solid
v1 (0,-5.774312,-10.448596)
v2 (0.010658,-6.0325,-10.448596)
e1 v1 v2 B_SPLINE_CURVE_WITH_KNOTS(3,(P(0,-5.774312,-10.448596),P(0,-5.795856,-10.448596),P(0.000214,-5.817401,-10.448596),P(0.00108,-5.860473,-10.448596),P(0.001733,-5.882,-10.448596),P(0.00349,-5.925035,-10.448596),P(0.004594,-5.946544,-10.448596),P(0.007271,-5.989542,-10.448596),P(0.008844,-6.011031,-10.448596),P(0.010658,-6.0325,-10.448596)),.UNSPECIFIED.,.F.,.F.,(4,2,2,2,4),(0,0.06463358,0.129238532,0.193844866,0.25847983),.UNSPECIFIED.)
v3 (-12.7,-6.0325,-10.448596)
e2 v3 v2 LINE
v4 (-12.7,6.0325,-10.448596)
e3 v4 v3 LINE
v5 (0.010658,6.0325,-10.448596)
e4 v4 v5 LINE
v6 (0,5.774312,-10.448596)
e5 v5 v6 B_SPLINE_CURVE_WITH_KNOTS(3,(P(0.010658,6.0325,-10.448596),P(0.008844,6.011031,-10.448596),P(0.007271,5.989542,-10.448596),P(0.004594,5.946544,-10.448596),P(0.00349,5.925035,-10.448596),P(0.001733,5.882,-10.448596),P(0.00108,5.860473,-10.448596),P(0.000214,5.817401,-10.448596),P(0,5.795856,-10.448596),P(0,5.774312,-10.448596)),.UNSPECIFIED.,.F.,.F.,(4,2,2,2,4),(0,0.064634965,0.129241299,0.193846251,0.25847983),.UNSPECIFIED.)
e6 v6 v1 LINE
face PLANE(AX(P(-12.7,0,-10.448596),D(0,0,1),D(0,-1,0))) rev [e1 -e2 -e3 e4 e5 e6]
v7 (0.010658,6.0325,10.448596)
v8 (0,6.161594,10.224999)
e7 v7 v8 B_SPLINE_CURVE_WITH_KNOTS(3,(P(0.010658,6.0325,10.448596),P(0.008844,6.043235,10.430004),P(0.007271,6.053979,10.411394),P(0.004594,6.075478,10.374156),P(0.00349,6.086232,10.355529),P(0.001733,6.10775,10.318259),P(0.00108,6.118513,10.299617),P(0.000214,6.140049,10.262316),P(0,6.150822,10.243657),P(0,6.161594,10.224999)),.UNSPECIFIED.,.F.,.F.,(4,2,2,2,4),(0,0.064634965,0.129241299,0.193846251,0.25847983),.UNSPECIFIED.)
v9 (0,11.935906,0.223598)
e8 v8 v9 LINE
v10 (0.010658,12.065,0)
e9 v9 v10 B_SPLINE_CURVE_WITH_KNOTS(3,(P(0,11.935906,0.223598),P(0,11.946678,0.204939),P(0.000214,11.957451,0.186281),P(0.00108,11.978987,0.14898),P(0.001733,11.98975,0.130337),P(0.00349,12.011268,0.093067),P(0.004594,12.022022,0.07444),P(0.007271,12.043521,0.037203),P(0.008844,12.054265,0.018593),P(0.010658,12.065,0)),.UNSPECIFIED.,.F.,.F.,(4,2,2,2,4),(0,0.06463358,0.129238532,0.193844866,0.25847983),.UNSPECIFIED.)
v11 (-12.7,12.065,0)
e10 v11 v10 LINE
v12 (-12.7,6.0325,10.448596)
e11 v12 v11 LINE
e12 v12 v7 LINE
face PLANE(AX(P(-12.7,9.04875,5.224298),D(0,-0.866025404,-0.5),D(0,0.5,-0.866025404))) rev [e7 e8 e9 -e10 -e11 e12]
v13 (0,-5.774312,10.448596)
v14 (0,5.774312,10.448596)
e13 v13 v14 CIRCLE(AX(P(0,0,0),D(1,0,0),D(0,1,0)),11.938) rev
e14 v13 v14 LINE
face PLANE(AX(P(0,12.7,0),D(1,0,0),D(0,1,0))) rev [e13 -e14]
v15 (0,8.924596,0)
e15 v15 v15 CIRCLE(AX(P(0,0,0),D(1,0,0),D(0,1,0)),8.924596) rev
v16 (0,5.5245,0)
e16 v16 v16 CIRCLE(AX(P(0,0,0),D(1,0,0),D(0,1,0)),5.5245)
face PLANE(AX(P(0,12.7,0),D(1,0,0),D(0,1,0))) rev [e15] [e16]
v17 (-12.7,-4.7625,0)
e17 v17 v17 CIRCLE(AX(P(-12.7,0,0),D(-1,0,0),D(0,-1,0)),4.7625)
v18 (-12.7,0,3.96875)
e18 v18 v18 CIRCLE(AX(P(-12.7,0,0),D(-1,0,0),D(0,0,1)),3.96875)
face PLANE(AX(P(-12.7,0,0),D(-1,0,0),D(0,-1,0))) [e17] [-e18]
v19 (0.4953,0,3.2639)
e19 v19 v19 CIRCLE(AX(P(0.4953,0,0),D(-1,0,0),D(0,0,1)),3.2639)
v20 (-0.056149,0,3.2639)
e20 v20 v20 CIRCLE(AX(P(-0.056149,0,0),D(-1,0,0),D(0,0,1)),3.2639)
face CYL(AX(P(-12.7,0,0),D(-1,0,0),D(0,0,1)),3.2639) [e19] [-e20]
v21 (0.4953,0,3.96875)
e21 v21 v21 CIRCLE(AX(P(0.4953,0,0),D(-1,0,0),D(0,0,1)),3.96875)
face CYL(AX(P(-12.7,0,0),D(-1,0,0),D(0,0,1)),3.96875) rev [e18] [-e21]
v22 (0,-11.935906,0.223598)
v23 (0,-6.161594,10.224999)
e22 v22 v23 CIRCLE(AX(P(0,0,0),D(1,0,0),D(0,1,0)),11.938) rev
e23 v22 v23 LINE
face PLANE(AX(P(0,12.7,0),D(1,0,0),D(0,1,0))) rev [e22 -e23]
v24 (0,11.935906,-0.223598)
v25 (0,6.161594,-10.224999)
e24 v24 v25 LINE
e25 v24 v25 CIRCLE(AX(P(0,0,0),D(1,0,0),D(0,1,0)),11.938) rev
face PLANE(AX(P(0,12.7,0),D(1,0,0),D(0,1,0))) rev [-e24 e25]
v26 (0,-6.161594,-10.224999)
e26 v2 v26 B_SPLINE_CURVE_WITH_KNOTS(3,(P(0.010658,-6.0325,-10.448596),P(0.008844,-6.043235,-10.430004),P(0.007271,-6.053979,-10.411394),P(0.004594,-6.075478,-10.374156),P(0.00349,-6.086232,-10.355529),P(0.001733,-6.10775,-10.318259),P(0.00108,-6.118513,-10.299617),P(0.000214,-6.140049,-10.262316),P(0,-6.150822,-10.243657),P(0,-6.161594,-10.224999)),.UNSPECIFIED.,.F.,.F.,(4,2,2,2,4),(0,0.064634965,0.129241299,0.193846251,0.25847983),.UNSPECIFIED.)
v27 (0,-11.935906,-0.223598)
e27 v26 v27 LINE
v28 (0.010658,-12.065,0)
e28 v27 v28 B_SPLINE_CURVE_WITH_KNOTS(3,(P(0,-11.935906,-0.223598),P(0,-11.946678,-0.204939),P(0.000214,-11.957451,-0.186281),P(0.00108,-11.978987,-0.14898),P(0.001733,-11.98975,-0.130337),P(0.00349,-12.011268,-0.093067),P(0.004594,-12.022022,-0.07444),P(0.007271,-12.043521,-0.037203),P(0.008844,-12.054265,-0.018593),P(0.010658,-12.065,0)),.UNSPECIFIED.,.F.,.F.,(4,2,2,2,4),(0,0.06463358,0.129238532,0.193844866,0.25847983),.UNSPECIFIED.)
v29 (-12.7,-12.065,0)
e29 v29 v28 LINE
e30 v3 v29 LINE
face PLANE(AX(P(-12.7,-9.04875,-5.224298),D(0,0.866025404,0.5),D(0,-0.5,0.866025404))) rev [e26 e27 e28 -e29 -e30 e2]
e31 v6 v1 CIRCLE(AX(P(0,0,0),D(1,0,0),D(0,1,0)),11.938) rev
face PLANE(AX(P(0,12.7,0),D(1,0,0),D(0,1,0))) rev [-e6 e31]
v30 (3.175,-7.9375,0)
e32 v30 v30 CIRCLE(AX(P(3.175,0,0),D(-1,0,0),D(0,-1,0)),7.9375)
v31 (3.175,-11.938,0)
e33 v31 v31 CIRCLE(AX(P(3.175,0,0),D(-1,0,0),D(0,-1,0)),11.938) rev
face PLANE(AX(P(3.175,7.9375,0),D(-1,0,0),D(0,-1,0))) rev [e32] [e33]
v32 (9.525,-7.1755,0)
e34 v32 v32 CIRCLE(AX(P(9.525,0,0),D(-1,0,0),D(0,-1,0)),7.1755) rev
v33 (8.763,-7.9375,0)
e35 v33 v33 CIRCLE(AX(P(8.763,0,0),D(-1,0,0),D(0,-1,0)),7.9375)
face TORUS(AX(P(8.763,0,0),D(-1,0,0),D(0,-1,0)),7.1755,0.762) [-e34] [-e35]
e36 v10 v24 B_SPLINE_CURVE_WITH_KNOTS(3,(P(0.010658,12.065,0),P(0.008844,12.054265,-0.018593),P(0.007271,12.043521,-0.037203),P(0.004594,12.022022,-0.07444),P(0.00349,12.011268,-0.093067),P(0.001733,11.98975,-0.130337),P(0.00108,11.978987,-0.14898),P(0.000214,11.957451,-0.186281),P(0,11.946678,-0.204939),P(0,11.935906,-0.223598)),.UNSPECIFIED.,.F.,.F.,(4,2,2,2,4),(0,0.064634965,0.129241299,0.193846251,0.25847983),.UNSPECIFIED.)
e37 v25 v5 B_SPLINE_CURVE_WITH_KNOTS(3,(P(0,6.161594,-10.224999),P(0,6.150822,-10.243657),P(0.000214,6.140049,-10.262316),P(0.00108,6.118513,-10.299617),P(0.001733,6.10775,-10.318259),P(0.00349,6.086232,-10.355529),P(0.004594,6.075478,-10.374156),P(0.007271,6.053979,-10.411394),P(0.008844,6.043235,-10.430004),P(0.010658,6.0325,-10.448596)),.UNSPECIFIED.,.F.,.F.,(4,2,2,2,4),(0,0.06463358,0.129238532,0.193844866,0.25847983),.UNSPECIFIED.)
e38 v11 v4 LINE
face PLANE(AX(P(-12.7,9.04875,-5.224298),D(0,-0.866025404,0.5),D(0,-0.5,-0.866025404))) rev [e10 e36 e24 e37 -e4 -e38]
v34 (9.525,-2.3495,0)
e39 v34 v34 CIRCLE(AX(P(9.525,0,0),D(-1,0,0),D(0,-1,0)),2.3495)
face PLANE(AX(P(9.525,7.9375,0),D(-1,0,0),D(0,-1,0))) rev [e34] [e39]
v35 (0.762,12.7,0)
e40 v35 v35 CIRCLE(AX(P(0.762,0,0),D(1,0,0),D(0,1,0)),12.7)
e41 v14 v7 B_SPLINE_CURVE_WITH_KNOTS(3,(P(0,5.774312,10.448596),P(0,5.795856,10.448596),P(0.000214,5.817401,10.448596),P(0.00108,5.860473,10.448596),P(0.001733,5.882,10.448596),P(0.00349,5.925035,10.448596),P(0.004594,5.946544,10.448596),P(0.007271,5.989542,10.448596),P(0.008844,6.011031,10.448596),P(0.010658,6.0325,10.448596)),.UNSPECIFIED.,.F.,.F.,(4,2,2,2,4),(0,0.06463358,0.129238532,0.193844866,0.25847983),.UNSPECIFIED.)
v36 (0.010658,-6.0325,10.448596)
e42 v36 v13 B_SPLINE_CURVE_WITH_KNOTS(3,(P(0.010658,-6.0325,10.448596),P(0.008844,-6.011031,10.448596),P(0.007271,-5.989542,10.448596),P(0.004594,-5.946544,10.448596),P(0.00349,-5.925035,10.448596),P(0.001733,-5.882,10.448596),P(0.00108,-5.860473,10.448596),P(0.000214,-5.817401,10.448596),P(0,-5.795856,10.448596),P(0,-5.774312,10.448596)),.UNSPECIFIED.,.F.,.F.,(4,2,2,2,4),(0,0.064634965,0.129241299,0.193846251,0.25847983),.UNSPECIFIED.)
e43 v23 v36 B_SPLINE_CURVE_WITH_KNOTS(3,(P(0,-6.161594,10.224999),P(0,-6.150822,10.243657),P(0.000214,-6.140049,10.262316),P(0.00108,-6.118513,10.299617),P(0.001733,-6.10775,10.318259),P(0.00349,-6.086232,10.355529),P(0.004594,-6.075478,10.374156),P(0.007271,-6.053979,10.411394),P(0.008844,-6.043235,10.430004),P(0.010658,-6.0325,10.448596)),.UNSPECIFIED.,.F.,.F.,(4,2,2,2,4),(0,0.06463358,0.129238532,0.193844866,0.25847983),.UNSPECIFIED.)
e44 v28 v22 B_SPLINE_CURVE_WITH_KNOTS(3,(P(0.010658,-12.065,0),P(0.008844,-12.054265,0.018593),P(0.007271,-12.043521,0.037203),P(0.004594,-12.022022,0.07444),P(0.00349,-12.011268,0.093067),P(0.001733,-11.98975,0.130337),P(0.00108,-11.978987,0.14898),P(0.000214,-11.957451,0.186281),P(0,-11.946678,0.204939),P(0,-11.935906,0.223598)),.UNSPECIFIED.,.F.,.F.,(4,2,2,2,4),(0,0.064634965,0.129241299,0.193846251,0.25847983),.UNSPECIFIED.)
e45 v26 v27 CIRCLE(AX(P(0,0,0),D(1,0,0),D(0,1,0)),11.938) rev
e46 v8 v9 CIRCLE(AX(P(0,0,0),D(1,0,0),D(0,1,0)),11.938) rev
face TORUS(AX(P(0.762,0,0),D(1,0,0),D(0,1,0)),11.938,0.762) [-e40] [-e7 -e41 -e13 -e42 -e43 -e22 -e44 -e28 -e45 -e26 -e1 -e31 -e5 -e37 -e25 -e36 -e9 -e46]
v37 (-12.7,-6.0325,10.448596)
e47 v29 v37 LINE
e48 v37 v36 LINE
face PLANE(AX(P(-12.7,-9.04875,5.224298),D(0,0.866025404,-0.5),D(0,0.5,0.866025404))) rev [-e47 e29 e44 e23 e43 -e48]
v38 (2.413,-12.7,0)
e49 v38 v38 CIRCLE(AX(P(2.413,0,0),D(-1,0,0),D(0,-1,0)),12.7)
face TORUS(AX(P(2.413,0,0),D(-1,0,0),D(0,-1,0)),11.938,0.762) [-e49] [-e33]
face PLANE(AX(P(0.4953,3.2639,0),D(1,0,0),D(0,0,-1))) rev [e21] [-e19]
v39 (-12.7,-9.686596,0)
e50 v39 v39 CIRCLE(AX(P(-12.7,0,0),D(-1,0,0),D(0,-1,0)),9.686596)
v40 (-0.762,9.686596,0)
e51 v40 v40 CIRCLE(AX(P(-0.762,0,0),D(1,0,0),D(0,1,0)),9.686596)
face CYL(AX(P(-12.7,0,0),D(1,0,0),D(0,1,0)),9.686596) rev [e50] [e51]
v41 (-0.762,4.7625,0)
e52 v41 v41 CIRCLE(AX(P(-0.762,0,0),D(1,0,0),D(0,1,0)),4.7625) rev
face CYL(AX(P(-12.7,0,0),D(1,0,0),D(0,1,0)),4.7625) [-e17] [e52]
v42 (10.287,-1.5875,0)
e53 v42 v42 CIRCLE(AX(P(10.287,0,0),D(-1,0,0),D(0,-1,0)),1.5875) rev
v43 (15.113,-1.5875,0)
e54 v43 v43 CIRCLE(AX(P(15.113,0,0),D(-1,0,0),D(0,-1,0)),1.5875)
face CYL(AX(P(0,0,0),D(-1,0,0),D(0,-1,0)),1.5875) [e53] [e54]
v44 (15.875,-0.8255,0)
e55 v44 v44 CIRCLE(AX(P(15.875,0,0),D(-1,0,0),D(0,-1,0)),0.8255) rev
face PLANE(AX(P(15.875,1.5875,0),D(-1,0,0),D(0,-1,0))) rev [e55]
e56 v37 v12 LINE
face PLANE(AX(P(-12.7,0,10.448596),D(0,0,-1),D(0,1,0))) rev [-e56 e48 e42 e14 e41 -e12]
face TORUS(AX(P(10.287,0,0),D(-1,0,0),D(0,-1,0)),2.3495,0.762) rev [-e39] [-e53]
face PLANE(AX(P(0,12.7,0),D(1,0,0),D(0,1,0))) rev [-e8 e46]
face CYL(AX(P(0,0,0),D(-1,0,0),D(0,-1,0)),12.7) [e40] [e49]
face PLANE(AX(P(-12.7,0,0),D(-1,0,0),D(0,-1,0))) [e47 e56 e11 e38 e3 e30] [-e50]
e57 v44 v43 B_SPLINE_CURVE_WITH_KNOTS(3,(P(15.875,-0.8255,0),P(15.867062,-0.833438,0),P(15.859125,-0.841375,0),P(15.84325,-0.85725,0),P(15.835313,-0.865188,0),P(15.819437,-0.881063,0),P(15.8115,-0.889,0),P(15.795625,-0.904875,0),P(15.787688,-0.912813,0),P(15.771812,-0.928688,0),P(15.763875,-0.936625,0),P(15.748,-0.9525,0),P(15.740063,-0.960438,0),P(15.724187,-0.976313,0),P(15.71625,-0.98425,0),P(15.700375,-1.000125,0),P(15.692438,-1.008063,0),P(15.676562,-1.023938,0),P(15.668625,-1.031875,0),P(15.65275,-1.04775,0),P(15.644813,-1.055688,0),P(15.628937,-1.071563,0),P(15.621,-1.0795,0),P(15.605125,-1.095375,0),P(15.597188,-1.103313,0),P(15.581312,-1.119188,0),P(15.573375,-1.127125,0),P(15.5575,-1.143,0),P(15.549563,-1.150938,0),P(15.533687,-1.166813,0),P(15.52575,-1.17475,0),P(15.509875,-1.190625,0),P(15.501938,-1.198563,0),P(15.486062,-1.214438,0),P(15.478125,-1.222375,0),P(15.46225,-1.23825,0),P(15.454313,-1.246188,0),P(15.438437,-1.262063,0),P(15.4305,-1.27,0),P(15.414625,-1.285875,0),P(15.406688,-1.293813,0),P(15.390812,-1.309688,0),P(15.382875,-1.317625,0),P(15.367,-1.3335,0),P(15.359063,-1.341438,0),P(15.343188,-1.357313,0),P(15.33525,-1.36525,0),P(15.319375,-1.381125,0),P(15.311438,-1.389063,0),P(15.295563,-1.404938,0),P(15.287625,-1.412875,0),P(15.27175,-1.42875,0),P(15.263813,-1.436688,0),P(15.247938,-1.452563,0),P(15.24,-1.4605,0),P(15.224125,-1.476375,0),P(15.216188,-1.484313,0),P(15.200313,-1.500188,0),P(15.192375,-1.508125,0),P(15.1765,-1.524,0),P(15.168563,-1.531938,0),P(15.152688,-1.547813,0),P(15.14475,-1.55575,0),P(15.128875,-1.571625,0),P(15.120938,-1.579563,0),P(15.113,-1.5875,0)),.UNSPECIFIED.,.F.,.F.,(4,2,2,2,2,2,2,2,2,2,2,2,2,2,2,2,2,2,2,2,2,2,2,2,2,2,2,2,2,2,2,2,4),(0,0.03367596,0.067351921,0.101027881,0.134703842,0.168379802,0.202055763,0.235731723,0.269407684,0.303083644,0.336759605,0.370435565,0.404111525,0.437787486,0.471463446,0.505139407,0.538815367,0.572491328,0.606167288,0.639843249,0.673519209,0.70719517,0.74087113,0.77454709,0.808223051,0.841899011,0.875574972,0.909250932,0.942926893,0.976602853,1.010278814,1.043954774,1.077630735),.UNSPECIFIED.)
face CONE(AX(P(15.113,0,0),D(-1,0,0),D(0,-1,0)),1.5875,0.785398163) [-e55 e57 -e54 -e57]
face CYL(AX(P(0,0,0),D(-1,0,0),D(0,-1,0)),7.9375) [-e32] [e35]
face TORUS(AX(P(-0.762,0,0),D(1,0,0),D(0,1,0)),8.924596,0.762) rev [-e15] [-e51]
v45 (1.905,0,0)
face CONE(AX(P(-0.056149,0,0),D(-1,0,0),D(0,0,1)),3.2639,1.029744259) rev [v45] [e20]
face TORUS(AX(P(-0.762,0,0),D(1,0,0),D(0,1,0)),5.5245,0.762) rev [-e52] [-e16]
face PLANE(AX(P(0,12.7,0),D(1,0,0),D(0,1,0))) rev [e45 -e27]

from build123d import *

# Parameters (mm, degrees)
SKETCH2_R           = 9.686596497
SKETCH2_R_2         = 4.7625
BOSS_EXTRUDE1_DEPTH = 12.7
CHAMFER1_SIZE       = 0.762
FILLET1_R           = 0.762
FILLET2_R           = 0.762


with BuildPart() as part:
    # Sketch1 → Revolve1 (revolve)
    with BuildSketch(Plane.XY, mode=Mode.PRIVATE) as revolve1_sk:
        Polygon((3.175, 7.9375), (9.525, 7.9375), (9.525, 1.5875), (15.875, 1.5875), (15.875, 0), (0, 0), (0, 12.7), (3.175, 12.7), align=None)
    revolve(revolve1_sk.sketch.rotate(Axis((0, 0, 0), (1, 0, 0)), 180), axis=Axis((0, 0, 0), (1, 0, 0)))

    # Sketch2 → Boss-Extrude1 (add)
    # profile 1 of 2: a face of its own
    with BuildSketch(Plane.ZY):
        Polygon((0, -12.065), (10.448596497, -6.0325), (10.448596497, 6.0325), (0, 12.065), (-10.448596497, 6.0325), (-10.448596497, -6.0325), align=None)
        with Locations(Location((0, 0, 0), (0, 0, 270))):
            Circle(SKETCH2_R, mode=Mode.SUBTRACT)
    # profile 2 of 2: a face of its own
    with BuildSketch(Plane.ZY):
        with Locations(Location((0, 0, 0), (0, 0, 270))):
            Circle(SKETCH2_R_2)
    extrude(amount=BOSS_EXTRUDE1_DEPTH)

    # Sketch5 → 5/16-18 Tapped Hole1 (revolve, cut)
    with BuildSketch(Plane(origin=(-12.7, 0, 0), x_dir=(0, 0, 1), z_dir=(0, 1, 0))):
        Polygon((0, 0), (0, 14.605), (3.2639, 12.643851026), (3.2639, 13.1953), (3.96875, 13.1953), (3.96875, 0), align=None)
    revolve(axis=Axis((-19.05, 0, 0), (1, 0, 0)), mode=Mode.SUBTRACT)

    # Chamfer1
    chamfer1_edges = [part.edges().sort_by_distance(p)[0] for p in [
        (15.875, 1.5875, 0),
    ]]
    chamfer(chamfer1_edges, length=CHAMFER1_SIZE)

    # Fillet1
    # the kernel refuses this fillet: 0.762 mm, written as the material it adds along each edge
    with BuildSketch(Plane(origin=(9.525, 0, 0), x_dir=(0, -1, 0), z_dir=(0, 0, 1))) as fillet1_piece_1:
        with BuildLine():
            CenterArc((1.5875 + FILLET1_R, FILLET1_R), FILLET1_R, 180, 90)
            Line((1.5875 + FILLET1_R, 0), (1.5875, 0))
            Line((1.5875, 0), (1.5875, FILLET1_R))
        make_face()
    revolve(axis=Axis((9.525, 0, 0), (1, 0, 0)))
    # the kernel refuses this fillet: 0.762 mm, written as the material it takes off along each edge
    with BuildSketch(Plane(origin=(3.175, 0, 0), x_dir=(0, -1, 0), z_dir=(0, 0, 1))) as fillet1_2_piece_1:
        with BuildLine():
            CenterArc((12.7 - FILLET1_R, -FILLET1_R), FILLET1_R, 0, 90)
            Line((12.7, -FILLET1_R), (12.7, 0))
            Line((12.7, 0), (12.7 - FILLET1_R, 0))
        make_face()
    revolve(axis=Axis((3.175, 0, 0), (1, 0, 0)), mode=Mode.SUBTRACT)
    with BuildSketch(Plane(origin=(9.525, 0, 0), x_dir=(0, -1, 0), z_dir=(0, 0, 1))) as fillet1_2_piece_2:
        with BuildLine():
            CenterArc((7.9375 - FILLET1_R, -FILLET1_R), FILLET1_R, 0, 90)
            Line((7.9375, -FILLET1_R), (7.9375, 0))
            Line((7.9375, 0), (7.9375 - FILLET1_R, 0))
        make_face()
    revolve(axis=Axis((9.525, 0, 0), (1, 0, 0)), mode=Mode.SUBTRACT)
    with BuildSketch(Plane(origin=(0, 0, 0), x_dir=(0, -1, 0), z_dir=(0, 0, 1))) as fillet1_2_piece_3_section:
        with BuildLine():
            CenterArc((12.7 - FILLET1_R, FILLET1_R), FILLET1_R, 270, 90)
            Line((12.7 - FILLET1_R, 0), (12.7, 0))
            Line((12.7, 0), (12.7, FILLET1_R))
        make_face()
    fillet1_2_piece_3 = revolve(axis=Axis((0, 0, 0), (1, 0, 0)), mode=Mode.PRIVATE)
    fillet1_2_piece_3 = split(fillet1_2_piece_3, bisect_by=Plane(origin=(0.195155167, -12.189466194, 0.215581772), z_dir=(0, -0.8660254037844387, -0.5000000000000003)), keep=Keep.TOP, mode=Mode.PRIVATE)
    add(fillet1_2_piece_3, mode=Mode.SUBTRACT)
    with BuildSketch(Plane(origin=(0, 0, 0), x_dir=(0, -1, 0), z_dir=(0, 0, 1))) as fillet1_2_piece_4_section:
        with BuildLine():
            CenterArc((12.7 - FILLET1_R, FILLET1_R), FILLET1_R, 270, 90)
            Line((12.7 - FILLET1_R, 0), (12.7, 0))
            Line((12.7, 0), (12.7, FILLET1_R))
        make_face()
    fillet1_2_piece_4 = revolve(axis=Axis((0, 0, 0), (1, 0, 0)), mode=Mode.PRIVATE)
    fillet1_2_piece_4 = split(fillet1_2_piece_4, bisect_by=Plane(origin=(0.215190513, -9.04875, 5.224298248), z_dir=(0, -0.8660254037844386, 0.5000000000000001)), keep=Keep.TOP, mode=Mode.PRIVATE)
    add(fillet1_2_piece_4, mode=Mode.SUBTRACT)
    with BuildSketch(Plane(origin=(0, 0, 0), x_dir=(0, -1, 0), z_dir=(0, 0, 1))) as fillet1_2_piece_5_section:
        with BuildLine():
            CenterArc((12.7 - FILLET1_R, FILLET1_R), FILLET1_R, 270, 90)
            Line((12.7 - FILLET1_R, 0), (12.7, 0))
            Line((12.7, 0), (12.7, FILLET1_R))
        make_face()
    fillet1_2_piece_5 = revolve(axis=Axis((0, 0, 0), (1, 0, 0)), mode=Mode.PRIVATE)
    fillet1_2_piece_5 = split(fillet1_2_piece_5, bisect_by=Plane(origin=(0.215190507, 0, -10.448596497), z_dir=(0, 0, -1)), keep=Keep.TOP, mode=Mode.PRIVATE)
    add(fillet1_2_piece_5, mode=Mode.SUBTRACT)
    with BuildSketch(Plane(origin=(0, 0, 0), x_dir=(0, -1, 0), z_dir=(0, 0, 1))) as fillet1_2_piece_6_section:
        with BuildLine():
            CenterArc((12.7 - FILLET1_R, FILLET1_R), FILLET1_R, 270, 90)
            Line((12.7 - FILLET1_R, 0), (12.7, 0))
            Line((12.7, 0), (12.7, FILLET1_R))
        make_face()
    fillet1_2_piece_6 = revolve(axis=Axis((0, 0, 0), (1, 0, 0)), mode=Mode.PRIVATE)
    fillet1_2_piece_6 = split(fillet1_2_piece_6, bisect_by=Plane(origin=(0.215190507, 0, 10.448596497), z_dir=(0, 0, 1)), keep=Keep.TOP, mode=Mode.PRIVATE)
    add(fillet1_2_piece_6, mode=Mode.SUBTRACT)
    with BuildSketch(Plane(origin=(0, 0, 0), x_dir=(0, -1, 0), z_dir=(0, 0, 1))) as fillet1_2_piece_7_section:
        with BuildLine():
            CenterArc((12.7 - FILLET1_R, FILLET1_R), FILLET1_R, 270, 90)
            Line((12.7 - FILLET1_R, 0), (12.7, 0))
            Line((12.7, 0), (12.7, FILLET1_R))
        make_face()
    fillet1_2_piece_7 = revolve(axis=Axis((0, 0, 0), (1, 0, 0)), mode=Mode.PRIVATE)
    fillet1_2_piece_7 = split(fillet1_2_piece_7, bisect_by=Plane(origin=(0.215190506, 9.048749998, -5.224298251), z_dir=(0, 0.8660254037844386, -0.5000000000000002)), keep=Keep.TOP, mode=Mode.PRIVATE)
    add(fillet1_2_piece_7, mode=Mode.SUBTRACT)
    with BuildSketch(Plane(origin=(0, 0, 0), x_dir=(0, -1, 0), z_dir=(0, 0, 1))) as fillet1_2_piece_8_section:
        with BuildLine():
            CenterArc((12.7 - FILLET1_R, FILLET1_R), FILLET1_R, 270, 90)
            Line((12.7 - FILLET1_R, 0), (12.7, 0))
            Line((12.7, 0), (12.7, FILLET1_R))
        make_face()
    fillet1_2_piece_8 = revolve(axis=Axis((0, 0, 0), (1, 0, 0)), mode=Mode.PRIVATE)
    fillet1_2_piece_8 = split(fillet1_2_piece_8, bisect_by=Plane(origin=(0.215190507, 9.048750002, 5.224298244), z_dir=(0, 0.8660254037844387, 0.5000000000000001)), keep=Keep.TOP, mode=Mode.PRIVATE)
    add(fillet1_2_piece_8, mode=Mode.SUBTRACT)

    # Fillet2
    fillet2_edges = [part.edges().sort_by_distance(p)[0] for p in [
        (0, 4.7625, 0),
        (0, 9.686596497, 0),
    ]]
    fillet(fillet2_edges, radius=FILLET2_R)


solid = part.part
